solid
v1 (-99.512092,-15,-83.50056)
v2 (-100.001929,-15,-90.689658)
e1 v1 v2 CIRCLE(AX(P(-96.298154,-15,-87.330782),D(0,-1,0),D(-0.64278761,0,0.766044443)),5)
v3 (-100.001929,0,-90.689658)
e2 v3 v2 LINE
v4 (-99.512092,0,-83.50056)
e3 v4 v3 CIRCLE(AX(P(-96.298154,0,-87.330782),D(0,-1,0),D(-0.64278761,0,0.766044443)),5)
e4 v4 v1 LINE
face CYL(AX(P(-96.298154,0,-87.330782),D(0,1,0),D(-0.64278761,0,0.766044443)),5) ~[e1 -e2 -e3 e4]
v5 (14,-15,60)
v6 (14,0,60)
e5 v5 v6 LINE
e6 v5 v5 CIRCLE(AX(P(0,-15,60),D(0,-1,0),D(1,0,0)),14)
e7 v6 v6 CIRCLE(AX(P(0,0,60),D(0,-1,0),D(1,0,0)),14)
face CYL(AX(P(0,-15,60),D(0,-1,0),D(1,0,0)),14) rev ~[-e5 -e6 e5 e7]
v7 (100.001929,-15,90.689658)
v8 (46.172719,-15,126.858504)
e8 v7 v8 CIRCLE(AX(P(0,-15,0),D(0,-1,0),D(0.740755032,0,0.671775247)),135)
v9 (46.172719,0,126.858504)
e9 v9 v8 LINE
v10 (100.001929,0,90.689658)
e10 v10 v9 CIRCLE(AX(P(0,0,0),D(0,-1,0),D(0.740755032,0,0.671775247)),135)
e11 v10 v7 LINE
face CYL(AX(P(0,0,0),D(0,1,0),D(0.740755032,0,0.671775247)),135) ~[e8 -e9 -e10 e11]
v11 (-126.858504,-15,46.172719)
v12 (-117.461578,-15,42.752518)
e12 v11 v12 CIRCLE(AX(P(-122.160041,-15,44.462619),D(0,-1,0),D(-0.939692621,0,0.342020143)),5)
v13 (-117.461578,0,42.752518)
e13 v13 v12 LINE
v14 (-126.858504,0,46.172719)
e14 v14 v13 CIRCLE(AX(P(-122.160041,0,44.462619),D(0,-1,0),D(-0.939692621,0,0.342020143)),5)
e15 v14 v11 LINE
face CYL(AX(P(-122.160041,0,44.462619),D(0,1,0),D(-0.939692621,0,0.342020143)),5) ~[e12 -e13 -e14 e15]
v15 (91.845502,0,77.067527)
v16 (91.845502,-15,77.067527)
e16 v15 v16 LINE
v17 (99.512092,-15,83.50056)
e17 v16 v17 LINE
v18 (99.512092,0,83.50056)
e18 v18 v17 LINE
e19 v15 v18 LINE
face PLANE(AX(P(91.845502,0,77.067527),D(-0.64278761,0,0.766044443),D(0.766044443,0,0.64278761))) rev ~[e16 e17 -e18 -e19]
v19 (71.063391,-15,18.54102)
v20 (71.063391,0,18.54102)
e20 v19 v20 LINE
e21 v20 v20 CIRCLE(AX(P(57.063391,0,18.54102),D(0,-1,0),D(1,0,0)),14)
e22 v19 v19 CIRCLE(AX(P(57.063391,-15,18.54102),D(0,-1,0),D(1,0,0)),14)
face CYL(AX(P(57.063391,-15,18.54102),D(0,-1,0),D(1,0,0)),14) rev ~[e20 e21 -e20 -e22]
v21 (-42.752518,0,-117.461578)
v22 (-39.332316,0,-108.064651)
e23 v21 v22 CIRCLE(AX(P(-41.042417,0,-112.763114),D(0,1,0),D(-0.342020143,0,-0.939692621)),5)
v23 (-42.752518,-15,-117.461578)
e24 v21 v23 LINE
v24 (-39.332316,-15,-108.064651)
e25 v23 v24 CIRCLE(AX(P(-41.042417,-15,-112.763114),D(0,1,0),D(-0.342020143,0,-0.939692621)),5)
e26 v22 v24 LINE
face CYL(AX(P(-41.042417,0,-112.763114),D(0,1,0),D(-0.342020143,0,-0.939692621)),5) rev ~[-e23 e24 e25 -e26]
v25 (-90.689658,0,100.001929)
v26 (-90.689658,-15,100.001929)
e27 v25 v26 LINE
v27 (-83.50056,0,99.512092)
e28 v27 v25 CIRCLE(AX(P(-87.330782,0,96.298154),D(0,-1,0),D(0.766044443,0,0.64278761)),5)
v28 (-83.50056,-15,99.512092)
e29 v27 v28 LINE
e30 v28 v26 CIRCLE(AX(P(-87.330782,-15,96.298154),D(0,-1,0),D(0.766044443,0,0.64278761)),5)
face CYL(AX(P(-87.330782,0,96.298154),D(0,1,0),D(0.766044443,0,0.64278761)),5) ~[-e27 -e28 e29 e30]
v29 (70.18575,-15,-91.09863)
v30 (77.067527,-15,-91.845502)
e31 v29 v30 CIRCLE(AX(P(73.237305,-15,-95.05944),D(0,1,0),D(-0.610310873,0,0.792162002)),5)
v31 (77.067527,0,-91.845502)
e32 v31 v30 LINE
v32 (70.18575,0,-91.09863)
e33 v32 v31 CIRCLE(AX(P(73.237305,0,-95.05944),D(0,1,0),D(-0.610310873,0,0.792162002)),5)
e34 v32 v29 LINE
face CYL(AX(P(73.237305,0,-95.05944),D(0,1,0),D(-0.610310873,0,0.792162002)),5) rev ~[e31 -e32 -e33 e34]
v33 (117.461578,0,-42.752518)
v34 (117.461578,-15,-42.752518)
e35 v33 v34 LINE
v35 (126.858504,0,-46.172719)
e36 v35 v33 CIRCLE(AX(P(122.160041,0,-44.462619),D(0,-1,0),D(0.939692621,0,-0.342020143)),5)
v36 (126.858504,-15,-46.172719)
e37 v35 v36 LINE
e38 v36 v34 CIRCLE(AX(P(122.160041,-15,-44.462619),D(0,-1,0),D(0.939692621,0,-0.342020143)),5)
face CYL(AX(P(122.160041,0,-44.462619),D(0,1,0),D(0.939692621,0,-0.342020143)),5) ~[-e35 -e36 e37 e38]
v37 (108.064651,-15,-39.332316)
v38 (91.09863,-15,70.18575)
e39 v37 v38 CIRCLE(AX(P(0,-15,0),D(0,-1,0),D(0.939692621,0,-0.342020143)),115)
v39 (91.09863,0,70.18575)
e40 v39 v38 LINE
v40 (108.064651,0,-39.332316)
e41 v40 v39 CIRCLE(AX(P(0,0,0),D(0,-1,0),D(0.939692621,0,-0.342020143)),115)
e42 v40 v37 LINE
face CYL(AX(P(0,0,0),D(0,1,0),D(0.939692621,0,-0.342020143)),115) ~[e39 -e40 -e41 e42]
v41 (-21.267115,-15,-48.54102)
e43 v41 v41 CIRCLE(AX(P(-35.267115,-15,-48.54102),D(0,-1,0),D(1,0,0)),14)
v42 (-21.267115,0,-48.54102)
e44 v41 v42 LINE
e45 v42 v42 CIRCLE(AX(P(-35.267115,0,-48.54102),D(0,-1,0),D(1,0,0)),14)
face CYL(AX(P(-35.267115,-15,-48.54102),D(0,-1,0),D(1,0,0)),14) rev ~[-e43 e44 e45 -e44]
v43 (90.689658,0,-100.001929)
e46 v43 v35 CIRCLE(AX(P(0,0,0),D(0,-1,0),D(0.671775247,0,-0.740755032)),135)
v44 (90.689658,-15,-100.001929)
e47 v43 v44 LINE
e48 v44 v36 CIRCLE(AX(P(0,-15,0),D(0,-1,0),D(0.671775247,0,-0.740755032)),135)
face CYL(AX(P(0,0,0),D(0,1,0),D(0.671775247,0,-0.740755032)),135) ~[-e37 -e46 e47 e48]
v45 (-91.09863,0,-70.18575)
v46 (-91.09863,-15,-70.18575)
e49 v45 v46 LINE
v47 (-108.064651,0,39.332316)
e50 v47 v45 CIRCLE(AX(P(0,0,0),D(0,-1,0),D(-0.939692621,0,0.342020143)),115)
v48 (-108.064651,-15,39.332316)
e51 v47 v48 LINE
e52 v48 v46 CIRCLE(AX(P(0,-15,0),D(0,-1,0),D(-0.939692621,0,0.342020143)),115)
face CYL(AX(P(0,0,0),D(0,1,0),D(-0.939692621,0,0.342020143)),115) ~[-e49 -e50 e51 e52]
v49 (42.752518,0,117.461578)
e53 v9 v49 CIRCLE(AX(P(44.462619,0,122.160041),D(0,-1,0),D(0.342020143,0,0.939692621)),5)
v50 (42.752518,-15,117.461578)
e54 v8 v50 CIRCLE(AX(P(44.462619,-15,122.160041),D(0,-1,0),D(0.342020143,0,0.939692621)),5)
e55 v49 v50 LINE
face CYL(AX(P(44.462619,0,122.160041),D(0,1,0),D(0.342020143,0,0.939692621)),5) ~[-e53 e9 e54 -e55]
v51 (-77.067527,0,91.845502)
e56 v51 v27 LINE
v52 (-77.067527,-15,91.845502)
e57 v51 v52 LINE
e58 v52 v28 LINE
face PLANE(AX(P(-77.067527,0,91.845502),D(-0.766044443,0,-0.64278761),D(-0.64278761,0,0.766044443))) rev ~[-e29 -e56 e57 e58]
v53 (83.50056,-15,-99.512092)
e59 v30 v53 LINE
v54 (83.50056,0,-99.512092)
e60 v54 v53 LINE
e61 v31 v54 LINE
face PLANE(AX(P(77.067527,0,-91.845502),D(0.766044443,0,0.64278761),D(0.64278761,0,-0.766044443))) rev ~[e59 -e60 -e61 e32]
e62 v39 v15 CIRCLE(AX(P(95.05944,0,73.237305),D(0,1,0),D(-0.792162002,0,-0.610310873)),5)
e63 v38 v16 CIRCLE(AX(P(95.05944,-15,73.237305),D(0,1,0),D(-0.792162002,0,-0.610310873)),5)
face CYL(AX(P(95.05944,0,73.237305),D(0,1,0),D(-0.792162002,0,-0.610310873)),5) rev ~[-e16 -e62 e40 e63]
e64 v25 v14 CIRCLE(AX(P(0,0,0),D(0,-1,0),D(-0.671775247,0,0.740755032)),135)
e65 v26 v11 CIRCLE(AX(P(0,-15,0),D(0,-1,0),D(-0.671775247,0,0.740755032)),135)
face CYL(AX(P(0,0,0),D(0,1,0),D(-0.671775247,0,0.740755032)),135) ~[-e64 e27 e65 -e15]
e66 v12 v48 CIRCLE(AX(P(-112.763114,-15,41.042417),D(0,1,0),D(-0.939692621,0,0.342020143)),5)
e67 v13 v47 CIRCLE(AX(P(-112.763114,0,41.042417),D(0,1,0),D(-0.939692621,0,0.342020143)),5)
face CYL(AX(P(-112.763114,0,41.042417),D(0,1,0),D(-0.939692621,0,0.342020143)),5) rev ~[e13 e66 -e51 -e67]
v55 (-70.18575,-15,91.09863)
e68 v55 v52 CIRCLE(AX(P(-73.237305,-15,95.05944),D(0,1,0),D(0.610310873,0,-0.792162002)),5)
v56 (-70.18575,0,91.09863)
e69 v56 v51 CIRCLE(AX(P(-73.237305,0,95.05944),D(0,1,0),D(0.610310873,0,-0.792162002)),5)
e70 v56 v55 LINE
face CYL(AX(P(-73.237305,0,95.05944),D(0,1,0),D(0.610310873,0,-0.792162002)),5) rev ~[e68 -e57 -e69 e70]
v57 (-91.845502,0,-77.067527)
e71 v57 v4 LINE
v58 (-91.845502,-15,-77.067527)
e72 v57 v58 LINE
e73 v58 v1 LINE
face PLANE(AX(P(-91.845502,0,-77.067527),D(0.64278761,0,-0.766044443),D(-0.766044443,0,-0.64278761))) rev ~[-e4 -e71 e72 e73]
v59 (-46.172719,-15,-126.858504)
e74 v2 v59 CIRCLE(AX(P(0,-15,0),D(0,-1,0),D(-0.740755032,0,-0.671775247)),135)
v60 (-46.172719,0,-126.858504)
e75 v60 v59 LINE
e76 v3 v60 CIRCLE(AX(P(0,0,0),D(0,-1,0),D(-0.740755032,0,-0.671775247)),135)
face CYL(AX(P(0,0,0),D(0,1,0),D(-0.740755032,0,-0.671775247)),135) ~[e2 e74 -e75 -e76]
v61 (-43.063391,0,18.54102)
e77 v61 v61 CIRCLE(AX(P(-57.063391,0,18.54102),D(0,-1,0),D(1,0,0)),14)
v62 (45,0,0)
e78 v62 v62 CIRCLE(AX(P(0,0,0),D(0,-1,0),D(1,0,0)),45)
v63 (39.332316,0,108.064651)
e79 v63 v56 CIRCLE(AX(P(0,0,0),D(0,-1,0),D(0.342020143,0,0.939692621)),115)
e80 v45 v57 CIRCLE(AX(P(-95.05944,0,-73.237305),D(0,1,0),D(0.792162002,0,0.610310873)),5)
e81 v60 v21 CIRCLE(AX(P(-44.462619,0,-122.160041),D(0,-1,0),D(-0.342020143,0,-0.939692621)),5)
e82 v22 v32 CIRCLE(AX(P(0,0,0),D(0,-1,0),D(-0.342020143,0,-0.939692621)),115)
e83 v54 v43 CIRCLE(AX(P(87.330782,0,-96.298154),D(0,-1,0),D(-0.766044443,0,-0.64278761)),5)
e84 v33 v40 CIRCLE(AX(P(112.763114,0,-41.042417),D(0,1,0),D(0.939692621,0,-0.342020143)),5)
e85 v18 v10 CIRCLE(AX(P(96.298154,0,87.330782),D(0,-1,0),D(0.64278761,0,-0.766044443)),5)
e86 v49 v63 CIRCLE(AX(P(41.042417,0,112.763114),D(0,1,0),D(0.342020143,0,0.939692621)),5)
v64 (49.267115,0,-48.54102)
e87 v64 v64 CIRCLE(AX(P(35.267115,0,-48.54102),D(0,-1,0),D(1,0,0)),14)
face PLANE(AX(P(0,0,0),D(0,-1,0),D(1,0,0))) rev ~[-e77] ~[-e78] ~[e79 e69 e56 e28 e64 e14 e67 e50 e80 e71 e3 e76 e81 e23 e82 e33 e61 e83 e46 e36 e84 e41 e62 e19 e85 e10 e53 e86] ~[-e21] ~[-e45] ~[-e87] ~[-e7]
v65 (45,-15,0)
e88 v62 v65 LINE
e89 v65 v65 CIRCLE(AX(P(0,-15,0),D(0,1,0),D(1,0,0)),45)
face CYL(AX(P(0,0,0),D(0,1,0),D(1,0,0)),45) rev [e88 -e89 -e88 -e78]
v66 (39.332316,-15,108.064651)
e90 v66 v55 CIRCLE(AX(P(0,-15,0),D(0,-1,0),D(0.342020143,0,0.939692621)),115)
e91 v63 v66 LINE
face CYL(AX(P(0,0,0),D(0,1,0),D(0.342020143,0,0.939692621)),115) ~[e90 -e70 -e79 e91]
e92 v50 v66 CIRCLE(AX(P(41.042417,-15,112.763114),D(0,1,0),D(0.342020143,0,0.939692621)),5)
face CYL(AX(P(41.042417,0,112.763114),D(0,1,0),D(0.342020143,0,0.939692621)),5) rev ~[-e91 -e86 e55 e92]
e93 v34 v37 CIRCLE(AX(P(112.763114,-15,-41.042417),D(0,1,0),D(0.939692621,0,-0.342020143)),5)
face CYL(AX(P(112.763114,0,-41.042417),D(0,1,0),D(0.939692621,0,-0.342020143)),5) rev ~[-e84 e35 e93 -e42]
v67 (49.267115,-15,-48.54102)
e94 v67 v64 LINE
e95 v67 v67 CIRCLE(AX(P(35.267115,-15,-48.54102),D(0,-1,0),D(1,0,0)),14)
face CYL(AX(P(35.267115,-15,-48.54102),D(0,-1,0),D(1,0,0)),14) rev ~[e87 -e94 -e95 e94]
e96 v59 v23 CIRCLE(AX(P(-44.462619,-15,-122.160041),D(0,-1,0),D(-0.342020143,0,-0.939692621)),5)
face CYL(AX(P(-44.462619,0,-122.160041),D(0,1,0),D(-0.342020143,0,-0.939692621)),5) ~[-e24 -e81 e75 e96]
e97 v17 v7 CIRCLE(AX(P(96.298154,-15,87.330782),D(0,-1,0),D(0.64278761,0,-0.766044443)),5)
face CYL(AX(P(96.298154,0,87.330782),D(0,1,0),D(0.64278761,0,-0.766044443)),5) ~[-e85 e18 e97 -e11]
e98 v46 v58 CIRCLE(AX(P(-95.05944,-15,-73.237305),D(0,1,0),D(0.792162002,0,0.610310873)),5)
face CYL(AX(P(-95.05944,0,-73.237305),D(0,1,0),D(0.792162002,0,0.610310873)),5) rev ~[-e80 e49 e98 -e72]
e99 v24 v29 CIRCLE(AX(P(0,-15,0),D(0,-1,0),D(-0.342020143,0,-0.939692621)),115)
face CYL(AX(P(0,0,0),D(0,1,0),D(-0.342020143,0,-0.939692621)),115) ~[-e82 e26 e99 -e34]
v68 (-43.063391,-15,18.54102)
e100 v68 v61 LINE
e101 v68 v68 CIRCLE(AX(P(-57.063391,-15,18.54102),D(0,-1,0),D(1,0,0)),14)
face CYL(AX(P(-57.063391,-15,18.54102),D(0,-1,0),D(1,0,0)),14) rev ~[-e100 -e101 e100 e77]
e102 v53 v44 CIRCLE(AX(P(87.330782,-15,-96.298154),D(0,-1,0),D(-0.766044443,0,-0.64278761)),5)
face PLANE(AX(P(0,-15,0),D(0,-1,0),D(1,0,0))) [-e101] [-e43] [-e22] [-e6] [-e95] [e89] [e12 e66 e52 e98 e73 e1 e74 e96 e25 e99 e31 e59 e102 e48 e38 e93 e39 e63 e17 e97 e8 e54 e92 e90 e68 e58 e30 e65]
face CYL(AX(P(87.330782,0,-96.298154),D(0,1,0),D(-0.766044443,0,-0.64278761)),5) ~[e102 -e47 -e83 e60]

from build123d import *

# Parameters (mm, degrees)
F0_R     = 14
F0_R_2   = 45
F1_DEPTH = 15
F3_COUNT = 4
F4_R     = 14
F5_DEPTH = 15.001


# Not quite as in the source:
# - a feature names something its author has since deleted; it is built from what else it names


with BuildPart() as f1:
    # F0 (on Front) → F1 (new body)
    with BuildSketch(Plane.XZ):
        with BuildLine():
            ThreePointArc((-117.4615775982, 42.7525179157), (-111.0530137777, 45.740880303), (-108.0646513904, 39.3323164825))
            ThreePointArc((-108.0646513904, 39.3323164825), (-113.6444232454, -17.6052567496), (-91.0986302517, -70.1857504502))
            ThreePointArc((-91.0986302517, -70.1857504502), (-90.0886289945, -73.7767817278), (-91.8455022142, -77.0675270332))
            Line((-91.8455022142, -77.0675270332), (-99.5120922253, -83.500559884))
            ThreePointArc((-99.5120922253, -83.500559884), (-101.2865881138, -86.990889679), (-100.0019293376, -90.6896583342))
            ThreePointArc((-100.0019293376, -90.6896583342), (-75.2914558589, -112.0544362114), (-46.172719349, -126.8585038061))
            ThreePointArc((-46.172719349, -126.8585038061), (-39.7641555284, -123.8701414188), (-42.7525179157, -117.4615775982))
            ThreePointArc((-42.7525179157, -117.4615775982), (-45.740880303, -111.0530137777), (-39.3323164825, -108.0646513904))
            ThreePointArc((-39.3323164825, -108.0646513904), (17.6052567496, -113.6444232454), (70.1857504502, -91.0986302517))
            ThreePointArc((70.1857504502, -91.0986302517), (73.7767817278, -90.0886289945), (77.0675270332, -91.8455022142))
            Line((77.0675270332, -91.8455022142), (83.500559884, -99.5120922253))
            ThreePointArc((83.500559884, -99.5120922253), (86.990889679, -101.2865881138), (90.6896583342, -100.0019293376))
            ThreePointArc((90.6896583342, -100.0019293376), (112.0544362114, -75.2914558589), (126.8585038061, -46.172719349))
            ThreePointArc((126.8585038061, -46.172719349), (123.8701414188, -39.7641555284), (117.4615775982, -42.7525179157))
            ThreePointArc((117.4615775982, -42.7525179157), (111.0530137777, -45.740880303), (108.0646513904, -39.3323164825))
            ThreePointArc((108.0646513904, -39.3323164825), (113.6444232454, 17.6052567496), (91.0986302517, 70.1857504502))
            ThreePointArc((91.0986302517, 70.1857504502), (90.0886289945, 73.7767817278), (91.8455022142, 77.0675270332))
            Line((91.8455022142, 77.0675270332), (99.5120922253, 83.500559884))
            ThreePointArc((99.5120922253, 83.500559884), (101.2865881138, 86.990889679), (100.0019293376, 90.6896583342))
            ThreePointArc((100.0019293376, 90.6896583342), (75.2914558589, 112.0544362114), (46.172719349, 126.8585038061))
            ThreePointArc((46.172719349, 126.8585038061), (39.7641555284, 123.8701414188), (42.7525179157, 117.4615775982))
            ThreePointArc((42.7525179157, 117.4615775982), (45.740880303, 111.0530137777), (39.3323164825, 108.0646513904))
            ThreePointArc((39.3323164825, 108.0646513904), (-17.6052567496, 113.6444232454), (-70.1857504502, 91.0986302517))
            ThreePointArc((-70.1857504502, 91.0986302517), (-73.7767817278, 90.0886289945), (-77.0675270332, 91.8455022142))
            Line((-77.0675270332, 91.8455022142), (-83.500559884, 99.5120922253))
            ThreePointArc((-83.500559884, 99.5120922253), (-86.990889679, 101.2865881138), (-90.6896583342, 100.0019293376))
            ThreePointArc((-90.6896583342, 100.0019293376), (-112.0544362114, 75.2914558589), (-126.8585038061, 46.172719349))
            ThreePointArc((-126.8585038061, 46.172719349), (-123.8701414188, 39.7641555284), (-117.4615775982, 42.7525179157))
        make_face()
        with Locations((-35.2671151375, -48.5410196625)):
            Circle(F0_R, mode=Mode.SUBTRACT)
        with Locations((35.2671151375, -48.5410196625)):
            Circle(F0_R, mode=Mode.SUBTRACT)
        with Locations((-57.0633909777, 18.5410196625)):
            Circle(F0_R, mode=Mode.SUBTRACT)
        Circle(F0_R_2, mode=Mode.SUBTRACT)
        with Locations((57.0633909777, 18.5410196625)):
            Circle(F0_R, mode=Mode.SUBTRACT)
        with Locations((0, 60)):
            Circle(F0_R, mode=Mode.SUBTRACT)
    extrude(amount=F1_DEPTH)

    # F3: F1 ×4 about axis
    f3_axis = Axis((0, -15, 0), (0, -1, 0))


with BuildPart() as f1_1:
    add(f1.part)
    for i in range(1, F3_COUNT):
        add(f1.part.rotate(f3_axis, i * 360 / F3_COUNT))

    # F4 (on face) → F5 (cut, through all)
    with BuildSketch(Plane.XZ.offset(15)):
        with Locations((0, 60)):
            Circle(F4_R)
        with Locations((-57.0633909777, 18.5410196625)):
            Circle(F4_R)
        with Locations((-35.2671151375, -48.5410196625)):
            Circle(F4_R)
        with Locations((35.2671151375, -48.5410196625)):
            Circle(F4_R)
        with Locations((57.0633909777, 18.5410196625)):
            Circle(F4_R)
    extrude(amount=-F5_DEPTH, mode=Mode.SUBTRACT)


solid = f1_1.part
